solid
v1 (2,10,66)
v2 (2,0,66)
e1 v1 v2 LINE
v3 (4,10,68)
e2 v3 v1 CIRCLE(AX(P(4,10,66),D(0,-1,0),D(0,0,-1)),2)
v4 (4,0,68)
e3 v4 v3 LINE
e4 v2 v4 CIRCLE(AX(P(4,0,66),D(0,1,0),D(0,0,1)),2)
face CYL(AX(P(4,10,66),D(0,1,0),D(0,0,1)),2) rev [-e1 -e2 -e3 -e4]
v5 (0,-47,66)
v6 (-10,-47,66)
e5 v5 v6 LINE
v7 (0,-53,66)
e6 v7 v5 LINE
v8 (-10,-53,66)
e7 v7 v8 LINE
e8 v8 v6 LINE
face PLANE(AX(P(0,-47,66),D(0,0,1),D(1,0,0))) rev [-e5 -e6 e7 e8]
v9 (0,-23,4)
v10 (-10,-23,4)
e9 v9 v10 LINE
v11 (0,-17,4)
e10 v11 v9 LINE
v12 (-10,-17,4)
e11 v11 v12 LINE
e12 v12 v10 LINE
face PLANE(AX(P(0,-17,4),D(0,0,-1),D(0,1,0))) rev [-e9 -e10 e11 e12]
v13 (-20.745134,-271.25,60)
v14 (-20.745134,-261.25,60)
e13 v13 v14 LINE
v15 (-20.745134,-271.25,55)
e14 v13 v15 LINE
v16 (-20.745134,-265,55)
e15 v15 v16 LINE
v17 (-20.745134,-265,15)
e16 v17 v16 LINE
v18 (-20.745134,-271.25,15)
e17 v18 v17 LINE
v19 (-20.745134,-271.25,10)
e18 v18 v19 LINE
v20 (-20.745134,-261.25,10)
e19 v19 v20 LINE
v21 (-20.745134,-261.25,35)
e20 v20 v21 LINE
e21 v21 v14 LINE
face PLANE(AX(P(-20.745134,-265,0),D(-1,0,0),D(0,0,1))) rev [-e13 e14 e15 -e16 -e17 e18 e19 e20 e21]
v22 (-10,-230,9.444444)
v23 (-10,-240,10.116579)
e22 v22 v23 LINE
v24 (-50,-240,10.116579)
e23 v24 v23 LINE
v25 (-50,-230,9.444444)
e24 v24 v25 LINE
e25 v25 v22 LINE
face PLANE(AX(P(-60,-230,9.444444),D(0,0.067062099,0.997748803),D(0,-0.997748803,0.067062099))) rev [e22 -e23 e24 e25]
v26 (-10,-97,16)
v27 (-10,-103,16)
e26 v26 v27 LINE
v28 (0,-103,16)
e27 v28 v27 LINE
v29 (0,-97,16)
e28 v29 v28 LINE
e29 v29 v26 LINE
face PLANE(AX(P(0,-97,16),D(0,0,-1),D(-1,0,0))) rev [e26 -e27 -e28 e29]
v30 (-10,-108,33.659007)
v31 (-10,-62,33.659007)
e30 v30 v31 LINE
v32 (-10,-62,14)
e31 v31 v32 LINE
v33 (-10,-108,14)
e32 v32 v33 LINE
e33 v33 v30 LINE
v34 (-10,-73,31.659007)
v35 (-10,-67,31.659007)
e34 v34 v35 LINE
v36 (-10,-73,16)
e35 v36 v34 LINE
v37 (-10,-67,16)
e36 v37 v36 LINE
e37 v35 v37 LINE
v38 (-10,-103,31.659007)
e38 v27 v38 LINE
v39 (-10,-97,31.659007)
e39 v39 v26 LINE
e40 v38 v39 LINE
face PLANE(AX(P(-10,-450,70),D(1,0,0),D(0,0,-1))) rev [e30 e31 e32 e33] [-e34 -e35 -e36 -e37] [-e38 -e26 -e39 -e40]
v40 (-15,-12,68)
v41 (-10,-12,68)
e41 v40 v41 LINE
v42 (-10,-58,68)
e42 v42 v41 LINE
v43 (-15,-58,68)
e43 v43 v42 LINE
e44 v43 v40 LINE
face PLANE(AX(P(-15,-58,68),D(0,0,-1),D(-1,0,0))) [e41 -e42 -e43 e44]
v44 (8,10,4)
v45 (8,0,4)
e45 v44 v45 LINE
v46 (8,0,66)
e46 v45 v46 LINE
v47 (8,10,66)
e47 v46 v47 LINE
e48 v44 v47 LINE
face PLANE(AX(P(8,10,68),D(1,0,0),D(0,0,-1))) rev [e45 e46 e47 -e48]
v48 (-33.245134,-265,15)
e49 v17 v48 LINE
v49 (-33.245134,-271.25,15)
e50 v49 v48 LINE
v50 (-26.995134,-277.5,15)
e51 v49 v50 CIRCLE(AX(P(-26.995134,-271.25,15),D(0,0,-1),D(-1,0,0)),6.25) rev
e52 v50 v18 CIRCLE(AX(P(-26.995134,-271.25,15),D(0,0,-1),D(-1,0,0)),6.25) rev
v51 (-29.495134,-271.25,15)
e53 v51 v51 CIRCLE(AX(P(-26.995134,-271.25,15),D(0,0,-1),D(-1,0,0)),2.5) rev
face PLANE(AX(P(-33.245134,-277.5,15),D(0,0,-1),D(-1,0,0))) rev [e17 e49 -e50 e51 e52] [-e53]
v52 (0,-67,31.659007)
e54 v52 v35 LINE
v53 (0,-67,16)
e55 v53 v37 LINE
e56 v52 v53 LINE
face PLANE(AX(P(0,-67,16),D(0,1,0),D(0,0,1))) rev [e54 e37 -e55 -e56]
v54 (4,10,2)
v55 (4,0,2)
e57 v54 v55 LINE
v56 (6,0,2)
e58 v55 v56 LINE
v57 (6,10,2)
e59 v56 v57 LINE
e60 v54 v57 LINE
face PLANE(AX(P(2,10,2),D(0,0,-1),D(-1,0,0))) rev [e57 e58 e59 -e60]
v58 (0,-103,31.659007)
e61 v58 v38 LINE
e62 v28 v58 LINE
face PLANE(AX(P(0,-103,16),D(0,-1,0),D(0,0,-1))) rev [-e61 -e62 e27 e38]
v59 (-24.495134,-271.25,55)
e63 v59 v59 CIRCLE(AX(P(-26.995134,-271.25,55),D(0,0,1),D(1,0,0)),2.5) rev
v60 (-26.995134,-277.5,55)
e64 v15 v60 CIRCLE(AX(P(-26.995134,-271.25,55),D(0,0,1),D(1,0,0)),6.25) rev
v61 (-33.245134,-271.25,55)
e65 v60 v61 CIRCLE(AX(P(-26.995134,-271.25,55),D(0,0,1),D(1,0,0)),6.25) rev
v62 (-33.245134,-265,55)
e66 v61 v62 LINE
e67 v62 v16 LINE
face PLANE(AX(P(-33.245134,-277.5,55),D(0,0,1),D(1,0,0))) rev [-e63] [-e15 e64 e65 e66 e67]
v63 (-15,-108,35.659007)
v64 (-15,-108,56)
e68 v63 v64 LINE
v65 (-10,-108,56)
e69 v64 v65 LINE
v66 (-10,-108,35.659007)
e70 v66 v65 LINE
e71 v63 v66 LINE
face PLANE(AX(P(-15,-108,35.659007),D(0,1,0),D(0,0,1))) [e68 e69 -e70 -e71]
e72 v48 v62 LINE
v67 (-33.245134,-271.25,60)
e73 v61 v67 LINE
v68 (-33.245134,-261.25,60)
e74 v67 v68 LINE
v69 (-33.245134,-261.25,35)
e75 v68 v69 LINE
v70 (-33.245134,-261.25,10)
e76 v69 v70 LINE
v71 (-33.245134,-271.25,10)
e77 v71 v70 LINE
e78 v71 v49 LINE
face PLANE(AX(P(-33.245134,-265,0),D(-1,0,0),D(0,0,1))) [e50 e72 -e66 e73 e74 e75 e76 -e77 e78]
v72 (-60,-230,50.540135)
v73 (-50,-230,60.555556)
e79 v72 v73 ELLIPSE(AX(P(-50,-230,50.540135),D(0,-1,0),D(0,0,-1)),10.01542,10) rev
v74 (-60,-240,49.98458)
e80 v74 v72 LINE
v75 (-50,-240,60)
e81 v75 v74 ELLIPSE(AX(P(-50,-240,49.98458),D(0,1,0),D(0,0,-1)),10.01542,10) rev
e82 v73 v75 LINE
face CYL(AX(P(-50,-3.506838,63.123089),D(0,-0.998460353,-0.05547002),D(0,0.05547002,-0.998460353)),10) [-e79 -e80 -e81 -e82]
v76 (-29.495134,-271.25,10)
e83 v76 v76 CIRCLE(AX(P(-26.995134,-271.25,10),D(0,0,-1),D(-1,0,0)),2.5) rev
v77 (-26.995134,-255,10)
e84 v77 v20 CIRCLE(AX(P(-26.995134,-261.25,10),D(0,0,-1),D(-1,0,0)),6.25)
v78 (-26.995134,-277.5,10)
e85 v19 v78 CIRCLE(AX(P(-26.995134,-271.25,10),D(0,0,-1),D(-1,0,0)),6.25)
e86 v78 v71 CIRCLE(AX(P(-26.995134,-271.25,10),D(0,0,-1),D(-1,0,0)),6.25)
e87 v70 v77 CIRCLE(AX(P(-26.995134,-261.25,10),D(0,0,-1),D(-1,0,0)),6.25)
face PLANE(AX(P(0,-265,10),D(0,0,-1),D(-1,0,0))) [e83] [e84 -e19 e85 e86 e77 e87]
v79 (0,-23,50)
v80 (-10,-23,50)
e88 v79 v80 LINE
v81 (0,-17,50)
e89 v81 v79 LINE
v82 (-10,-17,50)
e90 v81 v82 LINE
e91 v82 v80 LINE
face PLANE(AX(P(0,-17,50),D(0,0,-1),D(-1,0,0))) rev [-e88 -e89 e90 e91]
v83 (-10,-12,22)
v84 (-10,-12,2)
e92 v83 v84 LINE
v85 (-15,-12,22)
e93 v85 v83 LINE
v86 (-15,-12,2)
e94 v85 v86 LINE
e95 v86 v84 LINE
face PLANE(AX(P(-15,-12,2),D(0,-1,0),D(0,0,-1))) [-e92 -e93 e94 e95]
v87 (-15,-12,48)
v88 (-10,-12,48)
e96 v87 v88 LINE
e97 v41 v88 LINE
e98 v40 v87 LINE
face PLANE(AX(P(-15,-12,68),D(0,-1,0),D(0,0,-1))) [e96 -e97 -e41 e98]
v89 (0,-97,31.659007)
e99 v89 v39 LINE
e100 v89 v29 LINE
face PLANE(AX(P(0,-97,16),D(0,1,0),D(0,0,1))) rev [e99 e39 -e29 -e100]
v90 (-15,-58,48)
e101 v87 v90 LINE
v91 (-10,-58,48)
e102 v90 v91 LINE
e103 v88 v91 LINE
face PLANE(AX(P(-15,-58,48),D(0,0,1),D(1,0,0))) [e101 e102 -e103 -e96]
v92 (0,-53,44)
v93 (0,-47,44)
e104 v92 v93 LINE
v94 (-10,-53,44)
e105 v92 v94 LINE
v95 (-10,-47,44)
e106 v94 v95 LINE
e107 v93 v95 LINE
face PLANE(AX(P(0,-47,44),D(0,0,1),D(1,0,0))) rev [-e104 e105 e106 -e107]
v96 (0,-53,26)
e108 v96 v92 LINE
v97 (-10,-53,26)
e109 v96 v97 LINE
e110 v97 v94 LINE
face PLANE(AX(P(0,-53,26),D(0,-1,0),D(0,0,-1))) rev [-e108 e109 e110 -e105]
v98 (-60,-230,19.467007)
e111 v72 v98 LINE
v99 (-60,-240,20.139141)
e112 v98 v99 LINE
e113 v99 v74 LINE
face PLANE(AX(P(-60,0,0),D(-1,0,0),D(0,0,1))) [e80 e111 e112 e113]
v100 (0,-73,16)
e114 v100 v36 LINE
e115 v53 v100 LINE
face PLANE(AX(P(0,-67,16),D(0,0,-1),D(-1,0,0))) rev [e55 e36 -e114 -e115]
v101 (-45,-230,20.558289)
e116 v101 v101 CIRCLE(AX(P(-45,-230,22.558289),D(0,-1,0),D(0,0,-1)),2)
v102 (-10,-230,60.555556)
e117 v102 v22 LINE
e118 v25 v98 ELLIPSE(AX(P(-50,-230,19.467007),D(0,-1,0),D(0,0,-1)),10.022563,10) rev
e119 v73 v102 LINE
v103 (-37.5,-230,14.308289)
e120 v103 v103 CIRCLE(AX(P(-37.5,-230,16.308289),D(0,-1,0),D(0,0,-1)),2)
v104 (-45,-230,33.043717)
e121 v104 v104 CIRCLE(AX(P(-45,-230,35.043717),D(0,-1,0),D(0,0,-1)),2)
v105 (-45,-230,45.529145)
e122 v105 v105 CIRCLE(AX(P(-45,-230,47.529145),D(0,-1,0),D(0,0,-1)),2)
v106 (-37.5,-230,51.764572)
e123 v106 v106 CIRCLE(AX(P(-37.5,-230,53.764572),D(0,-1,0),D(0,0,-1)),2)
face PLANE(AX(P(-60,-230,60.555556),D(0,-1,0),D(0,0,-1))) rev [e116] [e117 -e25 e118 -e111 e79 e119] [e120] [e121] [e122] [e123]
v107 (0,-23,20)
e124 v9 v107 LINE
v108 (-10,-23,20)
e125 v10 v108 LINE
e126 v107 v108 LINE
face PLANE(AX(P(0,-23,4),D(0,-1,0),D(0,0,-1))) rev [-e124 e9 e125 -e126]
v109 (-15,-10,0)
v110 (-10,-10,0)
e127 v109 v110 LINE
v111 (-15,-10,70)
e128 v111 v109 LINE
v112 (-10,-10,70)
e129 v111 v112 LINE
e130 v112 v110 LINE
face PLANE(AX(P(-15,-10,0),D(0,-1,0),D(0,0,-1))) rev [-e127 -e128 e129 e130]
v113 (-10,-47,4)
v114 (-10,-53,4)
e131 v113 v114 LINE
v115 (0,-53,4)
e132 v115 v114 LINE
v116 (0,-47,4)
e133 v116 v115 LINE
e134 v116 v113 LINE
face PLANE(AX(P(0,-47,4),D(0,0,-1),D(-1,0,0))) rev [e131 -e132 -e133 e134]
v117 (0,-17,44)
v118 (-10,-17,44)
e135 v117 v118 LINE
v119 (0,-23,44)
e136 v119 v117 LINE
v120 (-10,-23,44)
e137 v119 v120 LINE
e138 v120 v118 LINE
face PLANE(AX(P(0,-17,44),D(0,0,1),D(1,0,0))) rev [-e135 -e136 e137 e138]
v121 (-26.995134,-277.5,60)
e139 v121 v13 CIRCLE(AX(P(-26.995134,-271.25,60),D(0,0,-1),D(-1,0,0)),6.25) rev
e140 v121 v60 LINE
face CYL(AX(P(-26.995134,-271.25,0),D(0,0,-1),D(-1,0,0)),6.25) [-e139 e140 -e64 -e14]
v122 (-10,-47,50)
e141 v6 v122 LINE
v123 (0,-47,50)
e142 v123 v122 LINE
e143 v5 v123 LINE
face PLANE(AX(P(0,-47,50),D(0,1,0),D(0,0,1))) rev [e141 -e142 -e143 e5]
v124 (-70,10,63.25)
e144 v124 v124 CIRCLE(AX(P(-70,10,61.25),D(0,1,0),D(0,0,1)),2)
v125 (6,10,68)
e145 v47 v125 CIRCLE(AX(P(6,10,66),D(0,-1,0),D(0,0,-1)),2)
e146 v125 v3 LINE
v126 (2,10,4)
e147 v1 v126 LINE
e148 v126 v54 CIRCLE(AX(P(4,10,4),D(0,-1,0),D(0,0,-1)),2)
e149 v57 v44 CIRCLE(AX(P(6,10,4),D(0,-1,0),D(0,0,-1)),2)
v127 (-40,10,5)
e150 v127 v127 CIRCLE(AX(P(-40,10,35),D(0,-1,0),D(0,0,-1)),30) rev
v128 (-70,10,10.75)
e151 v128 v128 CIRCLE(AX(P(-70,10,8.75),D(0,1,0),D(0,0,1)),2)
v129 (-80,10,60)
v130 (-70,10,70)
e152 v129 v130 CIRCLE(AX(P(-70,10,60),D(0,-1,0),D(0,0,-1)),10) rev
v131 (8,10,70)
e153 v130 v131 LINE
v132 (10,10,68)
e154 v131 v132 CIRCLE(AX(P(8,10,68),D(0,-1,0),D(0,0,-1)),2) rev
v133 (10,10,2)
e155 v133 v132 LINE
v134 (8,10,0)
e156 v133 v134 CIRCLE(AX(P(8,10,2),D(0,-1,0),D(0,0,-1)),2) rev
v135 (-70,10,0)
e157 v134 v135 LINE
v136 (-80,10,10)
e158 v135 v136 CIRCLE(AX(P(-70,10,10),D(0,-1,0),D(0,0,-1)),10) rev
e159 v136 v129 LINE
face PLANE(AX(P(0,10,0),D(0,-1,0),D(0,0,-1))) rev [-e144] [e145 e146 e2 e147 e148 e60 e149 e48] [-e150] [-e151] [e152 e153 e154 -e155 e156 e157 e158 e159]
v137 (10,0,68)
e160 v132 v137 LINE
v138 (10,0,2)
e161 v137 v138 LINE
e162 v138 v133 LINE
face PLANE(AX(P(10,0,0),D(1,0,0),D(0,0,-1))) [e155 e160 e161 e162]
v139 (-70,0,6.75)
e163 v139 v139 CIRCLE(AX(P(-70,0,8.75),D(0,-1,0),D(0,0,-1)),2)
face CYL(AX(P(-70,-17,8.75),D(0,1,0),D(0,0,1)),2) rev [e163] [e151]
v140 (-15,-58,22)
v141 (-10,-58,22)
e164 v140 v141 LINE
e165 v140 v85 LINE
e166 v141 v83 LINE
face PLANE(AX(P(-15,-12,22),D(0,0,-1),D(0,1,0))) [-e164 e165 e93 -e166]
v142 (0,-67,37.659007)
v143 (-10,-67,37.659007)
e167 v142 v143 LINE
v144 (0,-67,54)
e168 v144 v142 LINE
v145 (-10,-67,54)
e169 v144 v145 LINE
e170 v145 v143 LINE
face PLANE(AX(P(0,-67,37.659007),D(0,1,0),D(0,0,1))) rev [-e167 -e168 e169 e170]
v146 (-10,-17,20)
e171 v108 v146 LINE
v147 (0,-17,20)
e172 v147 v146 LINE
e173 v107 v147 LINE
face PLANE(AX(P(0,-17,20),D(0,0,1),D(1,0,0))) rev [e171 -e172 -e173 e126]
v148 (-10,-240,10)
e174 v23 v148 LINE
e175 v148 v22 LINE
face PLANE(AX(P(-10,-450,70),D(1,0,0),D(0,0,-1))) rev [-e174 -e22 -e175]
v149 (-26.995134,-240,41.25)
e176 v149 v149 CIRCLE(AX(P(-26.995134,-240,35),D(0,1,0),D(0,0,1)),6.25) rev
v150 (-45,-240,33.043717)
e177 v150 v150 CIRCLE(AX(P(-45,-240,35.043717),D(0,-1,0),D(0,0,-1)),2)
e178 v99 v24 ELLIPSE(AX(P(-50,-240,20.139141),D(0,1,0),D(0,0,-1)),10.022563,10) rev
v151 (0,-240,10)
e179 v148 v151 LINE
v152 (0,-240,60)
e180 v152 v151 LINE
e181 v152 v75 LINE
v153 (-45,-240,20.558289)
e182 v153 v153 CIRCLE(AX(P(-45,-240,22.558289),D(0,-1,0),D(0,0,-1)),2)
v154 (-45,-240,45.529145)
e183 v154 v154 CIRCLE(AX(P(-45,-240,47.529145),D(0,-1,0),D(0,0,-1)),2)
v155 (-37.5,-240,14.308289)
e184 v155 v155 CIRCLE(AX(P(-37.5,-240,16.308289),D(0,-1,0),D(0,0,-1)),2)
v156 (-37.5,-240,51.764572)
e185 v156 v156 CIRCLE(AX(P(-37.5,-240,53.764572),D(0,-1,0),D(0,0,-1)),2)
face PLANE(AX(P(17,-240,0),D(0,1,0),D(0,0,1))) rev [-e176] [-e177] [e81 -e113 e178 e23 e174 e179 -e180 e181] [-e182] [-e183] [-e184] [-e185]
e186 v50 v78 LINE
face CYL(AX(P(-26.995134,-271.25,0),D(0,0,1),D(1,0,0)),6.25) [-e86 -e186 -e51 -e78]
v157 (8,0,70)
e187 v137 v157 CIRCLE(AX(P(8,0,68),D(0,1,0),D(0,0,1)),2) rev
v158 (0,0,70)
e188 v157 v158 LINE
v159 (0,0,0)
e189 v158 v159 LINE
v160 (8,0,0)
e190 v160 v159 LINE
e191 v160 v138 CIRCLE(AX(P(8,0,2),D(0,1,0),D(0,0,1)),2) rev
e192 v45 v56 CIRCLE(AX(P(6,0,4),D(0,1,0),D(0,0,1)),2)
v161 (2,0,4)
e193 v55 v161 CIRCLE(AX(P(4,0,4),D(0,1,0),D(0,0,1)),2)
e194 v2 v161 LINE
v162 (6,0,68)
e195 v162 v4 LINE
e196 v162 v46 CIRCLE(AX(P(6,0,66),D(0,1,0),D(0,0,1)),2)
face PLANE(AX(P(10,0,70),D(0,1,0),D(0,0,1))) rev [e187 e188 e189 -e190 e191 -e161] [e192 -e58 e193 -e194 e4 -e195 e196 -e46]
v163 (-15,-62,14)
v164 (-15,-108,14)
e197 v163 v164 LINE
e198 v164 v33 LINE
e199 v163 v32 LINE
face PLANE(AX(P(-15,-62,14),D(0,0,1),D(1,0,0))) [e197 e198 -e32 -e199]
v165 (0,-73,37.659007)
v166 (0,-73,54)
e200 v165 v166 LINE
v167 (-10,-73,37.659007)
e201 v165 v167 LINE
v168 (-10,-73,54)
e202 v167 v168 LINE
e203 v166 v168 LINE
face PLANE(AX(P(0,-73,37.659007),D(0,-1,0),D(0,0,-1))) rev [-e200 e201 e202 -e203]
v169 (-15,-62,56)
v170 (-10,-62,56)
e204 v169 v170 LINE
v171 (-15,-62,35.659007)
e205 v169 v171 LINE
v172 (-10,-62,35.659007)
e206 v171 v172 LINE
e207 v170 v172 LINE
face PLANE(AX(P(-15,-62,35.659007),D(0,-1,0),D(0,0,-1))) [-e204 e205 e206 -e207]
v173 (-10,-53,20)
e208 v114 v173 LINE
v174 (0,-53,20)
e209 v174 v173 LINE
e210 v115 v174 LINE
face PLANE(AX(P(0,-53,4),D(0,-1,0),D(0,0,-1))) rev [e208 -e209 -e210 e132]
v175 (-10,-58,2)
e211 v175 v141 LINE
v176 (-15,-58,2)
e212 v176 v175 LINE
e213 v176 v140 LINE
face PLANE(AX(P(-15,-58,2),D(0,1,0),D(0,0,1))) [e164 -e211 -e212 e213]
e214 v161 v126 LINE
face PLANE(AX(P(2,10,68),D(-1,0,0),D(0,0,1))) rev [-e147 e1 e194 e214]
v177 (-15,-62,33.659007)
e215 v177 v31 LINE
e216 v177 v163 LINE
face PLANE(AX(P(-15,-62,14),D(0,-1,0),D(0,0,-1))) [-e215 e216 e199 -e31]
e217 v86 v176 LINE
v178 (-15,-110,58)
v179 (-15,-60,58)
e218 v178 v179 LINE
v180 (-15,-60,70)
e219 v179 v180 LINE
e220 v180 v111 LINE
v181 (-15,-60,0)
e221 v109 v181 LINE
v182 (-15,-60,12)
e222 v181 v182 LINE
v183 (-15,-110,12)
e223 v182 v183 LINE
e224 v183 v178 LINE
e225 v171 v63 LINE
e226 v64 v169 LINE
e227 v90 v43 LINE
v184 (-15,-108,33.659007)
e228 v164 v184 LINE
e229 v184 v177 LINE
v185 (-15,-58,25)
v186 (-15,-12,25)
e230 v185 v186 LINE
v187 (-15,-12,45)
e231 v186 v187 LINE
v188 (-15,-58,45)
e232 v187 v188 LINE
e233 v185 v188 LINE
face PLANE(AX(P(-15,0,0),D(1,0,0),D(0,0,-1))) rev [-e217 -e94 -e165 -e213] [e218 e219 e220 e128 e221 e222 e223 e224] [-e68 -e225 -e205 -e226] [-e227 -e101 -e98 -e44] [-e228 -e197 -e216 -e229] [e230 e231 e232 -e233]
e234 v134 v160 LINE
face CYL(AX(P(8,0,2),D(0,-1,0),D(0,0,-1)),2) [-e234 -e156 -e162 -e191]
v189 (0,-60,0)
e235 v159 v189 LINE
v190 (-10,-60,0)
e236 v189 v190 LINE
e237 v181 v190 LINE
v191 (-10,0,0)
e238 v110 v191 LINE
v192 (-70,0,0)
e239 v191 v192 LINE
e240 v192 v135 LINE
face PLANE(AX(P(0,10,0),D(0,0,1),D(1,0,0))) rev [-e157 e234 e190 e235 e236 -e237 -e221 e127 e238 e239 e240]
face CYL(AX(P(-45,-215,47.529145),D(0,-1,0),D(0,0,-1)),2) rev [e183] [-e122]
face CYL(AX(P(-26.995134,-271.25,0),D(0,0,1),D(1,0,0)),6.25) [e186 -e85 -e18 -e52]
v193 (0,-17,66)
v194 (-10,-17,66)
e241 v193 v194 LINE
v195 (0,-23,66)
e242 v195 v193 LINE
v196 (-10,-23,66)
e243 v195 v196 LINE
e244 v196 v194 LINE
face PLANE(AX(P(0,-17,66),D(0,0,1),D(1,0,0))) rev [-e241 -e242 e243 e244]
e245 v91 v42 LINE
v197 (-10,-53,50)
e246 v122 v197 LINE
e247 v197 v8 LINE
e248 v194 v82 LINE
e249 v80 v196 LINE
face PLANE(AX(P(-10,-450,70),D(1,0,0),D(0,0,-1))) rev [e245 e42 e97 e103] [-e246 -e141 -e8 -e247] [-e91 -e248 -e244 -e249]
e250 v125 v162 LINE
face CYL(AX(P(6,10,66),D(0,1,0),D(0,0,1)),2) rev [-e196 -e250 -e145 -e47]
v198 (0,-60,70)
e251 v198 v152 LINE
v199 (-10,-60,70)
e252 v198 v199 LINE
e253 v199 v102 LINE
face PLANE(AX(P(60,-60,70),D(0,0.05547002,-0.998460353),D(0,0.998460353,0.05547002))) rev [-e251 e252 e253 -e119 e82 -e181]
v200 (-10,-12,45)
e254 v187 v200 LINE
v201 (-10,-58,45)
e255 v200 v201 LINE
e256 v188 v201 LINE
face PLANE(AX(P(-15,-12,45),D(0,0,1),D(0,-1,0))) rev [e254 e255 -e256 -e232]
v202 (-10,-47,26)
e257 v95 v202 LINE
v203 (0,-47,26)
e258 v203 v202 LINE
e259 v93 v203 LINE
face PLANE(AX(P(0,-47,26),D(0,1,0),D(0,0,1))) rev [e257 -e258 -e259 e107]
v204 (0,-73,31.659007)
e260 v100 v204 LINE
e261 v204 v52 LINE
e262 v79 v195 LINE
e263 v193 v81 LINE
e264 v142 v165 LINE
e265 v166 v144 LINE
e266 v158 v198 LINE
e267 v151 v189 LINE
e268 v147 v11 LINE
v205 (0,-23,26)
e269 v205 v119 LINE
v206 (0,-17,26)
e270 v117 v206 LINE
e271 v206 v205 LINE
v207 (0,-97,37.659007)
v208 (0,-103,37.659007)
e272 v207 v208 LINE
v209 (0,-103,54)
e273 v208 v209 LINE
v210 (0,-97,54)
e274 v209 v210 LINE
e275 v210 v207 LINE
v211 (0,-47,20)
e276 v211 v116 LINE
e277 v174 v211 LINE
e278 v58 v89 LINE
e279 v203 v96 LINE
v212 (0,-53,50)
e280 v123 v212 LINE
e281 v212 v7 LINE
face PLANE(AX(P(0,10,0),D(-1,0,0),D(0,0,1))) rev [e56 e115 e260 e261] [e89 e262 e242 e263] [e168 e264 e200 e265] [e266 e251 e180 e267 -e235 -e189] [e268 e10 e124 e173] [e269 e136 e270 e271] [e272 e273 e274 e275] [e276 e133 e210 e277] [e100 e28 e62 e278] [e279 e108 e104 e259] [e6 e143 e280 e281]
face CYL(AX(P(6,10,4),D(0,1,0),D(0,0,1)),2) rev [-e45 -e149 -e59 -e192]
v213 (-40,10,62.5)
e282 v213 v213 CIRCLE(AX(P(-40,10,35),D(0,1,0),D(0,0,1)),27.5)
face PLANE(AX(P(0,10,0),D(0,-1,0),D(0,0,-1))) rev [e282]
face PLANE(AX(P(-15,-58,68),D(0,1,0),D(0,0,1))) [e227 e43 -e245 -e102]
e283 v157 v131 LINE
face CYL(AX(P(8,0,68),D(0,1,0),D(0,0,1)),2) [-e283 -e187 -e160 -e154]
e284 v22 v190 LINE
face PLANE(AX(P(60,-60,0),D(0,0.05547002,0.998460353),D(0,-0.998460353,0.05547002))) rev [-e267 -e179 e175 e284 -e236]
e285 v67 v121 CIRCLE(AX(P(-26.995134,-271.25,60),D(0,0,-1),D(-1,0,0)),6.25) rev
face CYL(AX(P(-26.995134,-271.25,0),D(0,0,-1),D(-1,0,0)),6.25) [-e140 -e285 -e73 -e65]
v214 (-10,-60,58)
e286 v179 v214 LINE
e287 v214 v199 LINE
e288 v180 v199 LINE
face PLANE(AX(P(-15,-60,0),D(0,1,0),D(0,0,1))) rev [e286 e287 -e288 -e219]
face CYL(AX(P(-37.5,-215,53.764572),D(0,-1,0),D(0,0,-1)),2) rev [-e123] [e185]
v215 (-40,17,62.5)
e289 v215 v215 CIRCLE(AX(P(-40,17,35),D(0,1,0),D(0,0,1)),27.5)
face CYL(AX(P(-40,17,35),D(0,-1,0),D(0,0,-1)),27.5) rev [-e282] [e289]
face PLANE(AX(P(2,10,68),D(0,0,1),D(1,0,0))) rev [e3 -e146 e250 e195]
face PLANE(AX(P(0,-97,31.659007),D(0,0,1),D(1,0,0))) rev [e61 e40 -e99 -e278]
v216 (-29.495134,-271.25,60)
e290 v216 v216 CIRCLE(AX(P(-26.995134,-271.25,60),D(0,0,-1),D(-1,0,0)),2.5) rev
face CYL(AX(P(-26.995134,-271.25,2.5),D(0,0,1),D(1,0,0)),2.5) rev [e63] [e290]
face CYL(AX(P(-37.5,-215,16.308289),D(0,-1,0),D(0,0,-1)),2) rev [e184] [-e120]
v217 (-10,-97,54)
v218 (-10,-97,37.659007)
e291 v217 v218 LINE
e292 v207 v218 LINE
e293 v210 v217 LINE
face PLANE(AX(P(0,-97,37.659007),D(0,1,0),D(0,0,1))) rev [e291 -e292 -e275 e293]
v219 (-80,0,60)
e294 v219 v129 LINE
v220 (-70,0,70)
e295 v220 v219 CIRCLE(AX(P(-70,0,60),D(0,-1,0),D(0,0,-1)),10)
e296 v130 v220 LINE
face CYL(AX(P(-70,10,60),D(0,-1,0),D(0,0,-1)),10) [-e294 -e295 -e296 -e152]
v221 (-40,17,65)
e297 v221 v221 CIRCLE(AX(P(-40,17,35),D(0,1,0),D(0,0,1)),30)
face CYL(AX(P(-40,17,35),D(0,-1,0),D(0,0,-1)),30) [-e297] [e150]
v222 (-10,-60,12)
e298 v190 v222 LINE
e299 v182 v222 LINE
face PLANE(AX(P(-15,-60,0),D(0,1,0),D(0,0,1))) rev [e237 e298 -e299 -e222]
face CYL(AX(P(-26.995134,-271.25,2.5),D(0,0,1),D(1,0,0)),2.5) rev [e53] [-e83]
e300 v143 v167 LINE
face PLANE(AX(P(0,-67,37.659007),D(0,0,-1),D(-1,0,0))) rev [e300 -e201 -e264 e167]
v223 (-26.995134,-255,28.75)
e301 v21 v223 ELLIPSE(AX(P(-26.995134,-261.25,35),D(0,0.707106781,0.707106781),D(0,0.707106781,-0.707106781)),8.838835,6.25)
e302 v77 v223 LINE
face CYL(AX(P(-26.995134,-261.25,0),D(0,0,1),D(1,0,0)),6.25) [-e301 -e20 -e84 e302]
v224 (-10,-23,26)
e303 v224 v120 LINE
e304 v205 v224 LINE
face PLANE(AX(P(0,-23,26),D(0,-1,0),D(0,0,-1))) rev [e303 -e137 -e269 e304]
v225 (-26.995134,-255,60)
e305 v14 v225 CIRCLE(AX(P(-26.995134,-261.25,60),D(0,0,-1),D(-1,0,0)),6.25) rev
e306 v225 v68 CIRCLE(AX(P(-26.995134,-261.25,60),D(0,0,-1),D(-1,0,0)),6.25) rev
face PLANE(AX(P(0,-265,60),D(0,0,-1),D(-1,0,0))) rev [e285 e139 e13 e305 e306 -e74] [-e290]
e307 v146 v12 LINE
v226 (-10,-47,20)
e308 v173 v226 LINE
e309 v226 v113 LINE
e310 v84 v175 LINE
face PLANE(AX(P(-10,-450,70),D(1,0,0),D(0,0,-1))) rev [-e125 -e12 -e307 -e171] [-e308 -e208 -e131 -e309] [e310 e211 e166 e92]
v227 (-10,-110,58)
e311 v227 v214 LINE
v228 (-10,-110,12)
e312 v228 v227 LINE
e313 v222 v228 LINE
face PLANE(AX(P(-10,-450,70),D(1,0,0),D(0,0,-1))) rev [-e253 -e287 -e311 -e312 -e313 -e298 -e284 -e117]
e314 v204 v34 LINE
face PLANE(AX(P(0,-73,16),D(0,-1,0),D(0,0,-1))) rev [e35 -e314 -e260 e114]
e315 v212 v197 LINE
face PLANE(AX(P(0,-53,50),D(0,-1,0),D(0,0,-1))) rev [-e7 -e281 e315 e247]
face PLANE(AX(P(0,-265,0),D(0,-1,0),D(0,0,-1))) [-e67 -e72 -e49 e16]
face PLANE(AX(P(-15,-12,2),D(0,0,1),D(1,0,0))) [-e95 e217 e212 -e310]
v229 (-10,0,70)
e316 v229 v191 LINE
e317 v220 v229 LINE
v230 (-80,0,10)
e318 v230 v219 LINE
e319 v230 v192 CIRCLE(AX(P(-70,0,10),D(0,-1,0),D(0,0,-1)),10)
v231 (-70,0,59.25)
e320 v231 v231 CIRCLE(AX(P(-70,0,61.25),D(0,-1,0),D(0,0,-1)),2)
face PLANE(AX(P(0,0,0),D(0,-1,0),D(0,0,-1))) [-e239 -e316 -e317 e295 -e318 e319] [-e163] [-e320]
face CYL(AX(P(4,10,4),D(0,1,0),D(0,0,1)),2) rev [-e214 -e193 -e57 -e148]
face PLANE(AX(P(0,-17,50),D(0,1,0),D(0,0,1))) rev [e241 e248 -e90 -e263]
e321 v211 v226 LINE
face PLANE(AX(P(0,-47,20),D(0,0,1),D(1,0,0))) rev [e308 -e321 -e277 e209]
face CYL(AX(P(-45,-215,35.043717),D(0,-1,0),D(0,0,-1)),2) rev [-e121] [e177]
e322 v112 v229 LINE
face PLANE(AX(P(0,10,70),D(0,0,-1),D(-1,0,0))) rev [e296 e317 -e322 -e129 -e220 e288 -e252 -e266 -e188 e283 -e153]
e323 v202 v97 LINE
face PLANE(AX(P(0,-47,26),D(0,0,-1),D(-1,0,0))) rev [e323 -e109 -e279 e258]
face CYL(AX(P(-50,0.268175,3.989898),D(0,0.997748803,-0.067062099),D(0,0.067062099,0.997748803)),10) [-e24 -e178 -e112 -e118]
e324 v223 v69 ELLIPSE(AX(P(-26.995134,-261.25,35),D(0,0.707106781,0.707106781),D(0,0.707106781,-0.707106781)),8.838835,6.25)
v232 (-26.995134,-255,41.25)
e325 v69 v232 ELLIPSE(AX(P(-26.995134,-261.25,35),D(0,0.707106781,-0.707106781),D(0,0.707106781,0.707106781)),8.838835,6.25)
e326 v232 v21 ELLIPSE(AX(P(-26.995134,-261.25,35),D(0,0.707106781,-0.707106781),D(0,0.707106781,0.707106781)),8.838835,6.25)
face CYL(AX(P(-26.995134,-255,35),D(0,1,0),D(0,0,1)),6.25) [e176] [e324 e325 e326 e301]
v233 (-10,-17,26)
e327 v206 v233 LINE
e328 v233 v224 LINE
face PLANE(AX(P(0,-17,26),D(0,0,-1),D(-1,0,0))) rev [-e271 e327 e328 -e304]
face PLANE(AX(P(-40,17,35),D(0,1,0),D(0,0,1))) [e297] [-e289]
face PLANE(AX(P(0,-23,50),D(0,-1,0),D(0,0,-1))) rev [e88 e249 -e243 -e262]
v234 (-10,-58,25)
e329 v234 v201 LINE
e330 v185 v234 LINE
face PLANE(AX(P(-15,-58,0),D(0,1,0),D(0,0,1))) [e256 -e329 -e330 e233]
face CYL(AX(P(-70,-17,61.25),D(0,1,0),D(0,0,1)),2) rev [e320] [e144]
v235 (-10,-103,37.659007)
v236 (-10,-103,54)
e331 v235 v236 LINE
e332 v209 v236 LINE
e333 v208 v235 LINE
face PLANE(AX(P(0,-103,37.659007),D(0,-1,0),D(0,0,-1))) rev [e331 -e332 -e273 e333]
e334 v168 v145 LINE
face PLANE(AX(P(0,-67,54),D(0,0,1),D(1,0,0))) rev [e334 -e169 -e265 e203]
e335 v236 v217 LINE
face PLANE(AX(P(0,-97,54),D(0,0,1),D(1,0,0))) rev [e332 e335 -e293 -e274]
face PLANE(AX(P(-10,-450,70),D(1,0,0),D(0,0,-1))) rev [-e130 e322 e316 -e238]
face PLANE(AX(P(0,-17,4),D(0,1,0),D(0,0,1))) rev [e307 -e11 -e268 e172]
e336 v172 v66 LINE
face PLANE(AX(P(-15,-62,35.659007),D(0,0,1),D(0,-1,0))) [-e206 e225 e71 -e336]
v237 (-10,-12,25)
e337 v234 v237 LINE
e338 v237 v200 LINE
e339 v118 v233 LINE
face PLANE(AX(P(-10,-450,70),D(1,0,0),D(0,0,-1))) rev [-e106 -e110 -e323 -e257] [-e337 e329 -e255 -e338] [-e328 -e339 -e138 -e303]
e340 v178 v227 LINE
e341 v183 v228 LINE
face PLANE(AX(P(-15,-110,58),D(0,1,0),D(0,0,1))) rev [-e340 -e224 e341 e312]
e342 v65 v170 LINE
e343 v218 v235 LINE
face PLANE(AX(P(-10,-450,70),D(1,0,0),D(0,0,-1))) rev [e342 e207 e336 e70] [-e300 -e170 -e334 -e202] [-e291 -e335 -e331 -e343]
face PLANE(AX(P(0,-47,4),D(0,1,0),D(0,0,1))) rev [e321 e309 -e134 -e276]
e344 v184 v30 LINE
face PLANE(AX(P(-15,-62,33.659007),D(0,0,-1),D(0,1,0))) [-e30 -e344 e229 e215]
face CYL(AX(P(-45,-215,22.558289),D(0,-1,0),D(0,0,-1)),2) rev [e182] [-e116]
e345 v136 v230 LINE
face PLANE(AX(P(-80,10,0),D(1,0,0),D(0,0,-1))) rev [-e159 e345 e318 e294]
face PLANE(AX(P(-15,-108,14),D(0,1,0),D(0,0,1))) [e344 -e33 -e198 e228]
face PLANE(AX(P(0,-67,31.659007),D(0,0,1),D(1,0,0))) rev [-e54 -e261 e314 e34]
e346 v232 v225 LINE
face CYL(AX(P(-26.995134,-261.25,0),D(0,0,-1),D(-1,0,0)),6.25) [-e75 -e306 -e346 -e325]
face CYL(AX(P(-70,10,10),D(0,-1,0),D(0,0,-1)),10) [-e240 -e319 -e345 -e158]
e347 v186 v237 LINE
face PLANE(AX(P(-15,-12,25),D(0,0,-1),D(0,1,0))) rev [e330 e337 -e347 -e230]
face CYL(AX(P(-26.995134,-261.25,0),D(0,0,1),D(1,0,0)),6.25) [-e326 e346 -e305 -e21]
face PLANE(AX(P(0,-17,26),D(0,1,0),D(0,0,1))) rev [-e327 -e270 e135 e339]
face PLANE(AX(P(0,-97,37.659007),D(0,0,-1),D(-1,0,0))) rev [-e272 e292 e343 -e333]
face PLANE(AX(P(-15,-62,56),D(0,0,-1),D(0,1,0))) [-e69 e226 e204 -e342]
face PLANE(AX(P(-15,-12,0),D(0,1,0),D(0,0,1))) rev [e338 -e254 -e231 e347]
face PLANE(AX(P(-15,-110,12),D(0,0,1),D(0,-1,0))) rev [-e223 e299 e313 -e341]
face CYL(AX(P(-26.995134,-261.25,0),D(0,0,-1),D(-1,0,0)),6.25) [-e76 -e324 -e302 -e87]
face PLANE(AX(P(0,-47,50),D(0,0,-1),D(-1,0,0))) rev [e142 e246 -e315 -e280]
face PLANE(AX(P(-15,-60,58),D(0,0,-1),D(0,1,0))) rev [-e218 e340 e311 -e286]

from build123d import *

# Parameters (mm, degrees)
SKETCH1_W                = 80
SKETCH1_H                = 70
BOSS_EXTRUDE1_DEPTH      = 10
SKETCH2_W                = 10
SKETCH2_H                = 70
BOSS_EXTRUDE2_DEPTH      = 450
SKETCH3_R                = 30
SKETCH3_R_2              = 27.5
BOSS_EXTRUDE3_DEPTH      = 7
SKETCH6_R                = 2
CUT_EXTRUDE3_DEPTH       = 27
SKETCH7_W                = 70
SKETCH7_H                = 210
CUT_EXTRUDE4_DEPTH       = 27
CUT_EXTRUDE5_DEPTH       = 70
BOSS_EXTRUDE5_DEPTH      = 50
SKETCH12_R               = 10
SKETCH12_R_2             = 7.5
SKETCH12_R_3             = 2.5
BOSS_EXTRUDE6_DEPTH      = 25
SKETCH13_R               = 2
CUT_EXTRUDE6_DEPTH       = 25
SKETCH14_W               = 24
SKETCH14_H               = 50
SKETCH14_W_2             = 20
SKETCH14_H_2             = 46
BOSS_EXTRUDE7_DEPTH      = 5
SKETCH15_W               = 24
SKETCH15_H               = 50
SKETCH15_W_2             = 20
SKETCH15_H_2             = 46
BOSS_EXTRUDE8_DEPTH      = 5
SKETCH16_W               = 22
SKETCH16_H               = 2
BOSS_EXTRUDE9_DEPTH      = 5
SKETCH17_W               = 46
SKETCH17_H               = 50
SKETCH17_W_2             = 19.659007001
SKETCH17_H_2             = 46
SKETCH17_W_3             = 20.340992999
BOSS_EXTRUDE10_DEPTH     = 5
SKETCH18_W               = 16
SKETCH18_H               = 6
SKETCH18_W_2             = 18
CUT_EXTRUDE8_DEPTH       = 10
SKETCH19_W               = 15.659007001
SKETCH19_H               = 6
SKETCH19_W_2             = 16.340992999
CUT_EXTRUDE9_DEPTH       = 10
FILLET1_R                = 10
FILLET2_R                = 10
SKETCH20_W               = 70
SKETCH20_H               = 10
BOSS_EXTRUDE11_DEPTH     = 10
SKETCH21_W               = 6
SKETCH21_H               = 66
CUT_EXTRUDE10_DEPTH      = 10
FILLET3_R                = 2
FILLET4_R                = 2
FILLET5_R                = 2
SKETCH23_W               = 25.167549862
SKETCH23_H               = 25.727851888
CUT_EXTRUDE12_DEPTH      = 116
SKETCH25_R               = 6.25
BOSS_EXTRUDE12_DEPTH     = 15
SKETCH26_W               = 12.5
SKETCH26_H               = 21
SKETCH26_H_2             = 4
BOSS_EXTRUDE13_DEPTH     = 10
SKETCH27_W               = 12.5
SKETCH27_H               = 5
BOSS_EXTRUDE15_DEPTH     = 12.5
FILLET8_R                = 6.25
CUT_EXTRUDE14_DEPTH      = 52.5
CUT_EXTRUDE14_DEPTH_BACK = 12.5
SKETCH29_R               = 2.5
FILLET9_R                = 6.25
SKETCH30_W               = 1
SKETCH30_H               = 46
BOSS_EXTRUDE16_DEPTH     = 5


# Some blends are built 0.0001 mm under size
with BuildPart() as part:
    # Sketch1 → Boss-Extrude1 (new body)
    with BuildSketch(Plane(origin=(0, 0, 0), x_dir=(1, 0, 0), z_dir=(0, 1, 0))):
        with Locations((-40, -35)):
            Rectangle(SKETCH1_W, SKETCH1_H)
    extrude(amount=BOSS_EXTRUDE1_DEPTH)

    # Sketch2 → Boss-Extrude2 (add)
    with BuildSketch(Plane.XZ):
        with Locations((-5, 35)):
            Rectangle(SKETCH2_W, SKETCH2_H)
    extrude(amount=BOSS_EXTRUDE2_DEPTH)

    # Sketch3 → Boss-Extrude3 (add)
    with BuildSketch(Plane(origin=(0, 10, 0), x_dir=(1, 0, 0), z_dir=(0, 1, 0))):
        with Locations(Location((-40, -35, 0), (0, 0, 90))):
            Circle(SKETCH3_R)
        with Locations(Location((-40, -35, 0), (0, 0, 270))):
            Circle(SKETCH3_R_2, mode=Mode.SUBTRACT)
    extrude(amount=BOSS_EXTRUDE3_DEPTH)

    # Sketch6 → Cut-Extrude3 (cut)
    with BuildSketch(Plane(origin=(0, 10, 0), x_dir=(1, 0, 0), z_dir=(0, 1, 0))):
        with Locations(Location((-70, -61.25, 0), (0, 0, 270))):
            Circle(SKETCH6_R)
        with Locations(Location((-70, -8.75, 0), (0, 0, 270))):
            Circle(SKETCH6_R)
    extrude(amount=-CUT_EXTRUDE3_DEPTH, mode=Mode.SUBTRACT)

    # Sketch7 → Cut-Extrude4 (cut)
    with BuildSketch(Plane.ZY.offset(10)):
        with Locations((35, -345)):
            Rectangle(SKETCH7_W, SKETCH7_H)
    extrude(amount=-CUT_EXTRUDE4_DEPTH, mode=Mode.SUBTRACT)

    # Sketch10 → Cut-Extrude5 (cut)
    with BuildSketch(Plane.ZY.offset(10)):
        Polygon((0, -60), (10, -240), (0, -240), align=None)
        Polygon((70, -60), (60, -240), (70, -240), align=None)
    extrude(amount=-CUT_EXTRUDE5_DEPTH, mode=Mode.SUBTRACT)

    # Sketch11 → Boss-Extrude5 (add)
    with BuildSketch(Plane.ZY.offset(10)):
        Polygon((10.116578541, -240), (60, -240), (60.555555556, -230), (9.444444444, -230), align=None)
    extrude(amount=BOSS_EXTRUDE5_DEPTH)

    # Sketch12 → Boss-Extrude6 (add)
    # profile 1 of 2: a face of its own
    with BuildSketch(Plane.XZ.offset(240)):
        with Locations(Location((-30, 35, 0), (0, 0, 90))):
            Circle(SKETCH12_R)
        with Locations(Location((-30, 35, 0), (0, 0, 270))):
            Circle(SKETCH12_R_2, mode=Mode.SUBTRACT)
    # profile 2 of 2: a face of its own
    with BuildSketch(Plane.XZ.offset(240)):
        with Locations(Location((-30, 35, 0), (0, 0, 90))):
            Circle(SKETCH12_R_3)
    extrude(amount=BOSS_EXTRUDE6_DEPTH)

    # Sketch13 → Cut-Extrude6 (cut)
    with BuildSketch(Plane(origin=(0, -240, 0), x_dir=(-1, 0, 0), z_dir=(0, -1, 0))):
        with Locations(Location((45, -47.529144635, 0), (0, 0, 90))):
            Circle(SKETCH13_R)
        with Locations(Location((45, -22.558289271, 0), (0, 0, 90))):
            Circle(SKETCH13_R)
        with Locations(Location((45, -35.043716953, 0), (0, 0, 90))):
            Circle(SKETCH13_R)
        with Locations(Location((37.5, -53.764572318, 0), (0, 0, 90))):
            Circle(SKETCH13_R)
        with Locations(Location((37.5, -16.308289271, 0), (0, 0, 90))):
            Circle(SKETCH13_R)
    extrude(amount=-CUT_EXTRUDE6_DEPTH, mode=Mode.SUBTRACT)

    # Sketch14 → Boss-Extrude7 (add)
    with BuildSketch(Plane.ZY.offset(10)):
        with Locations((12, -35)):
            Rectangle(SKETCH14_W, SKETCH14_H)
        with Locations((12, -35)):
            Rectangle(SKETCH14_W_2, SKETCH14_H_2, mode=Mode.SUBTRACT)
    extrude(amount=BOSS_EXTRUDE7_DEPTH)

    # Sketch15 → Boss-Extrude8 (add)
    with BuildSketch(Plane.ZY.offset(10)):
        with Locations((58, -35)):
            Rectangle(SKETCH15_W, SKETCH15_H)
        with Locations((58, -35)):
            Rectangle(SKETCH15_W_2, SKETCH15_H_2, mode=Mode.SUBTRACT)
    extrude(amount=BOSS_EXTRUDE8_DEPTH)

    # Sketch16 → Boss-Extrude9 (add)
    with BuildSketch(Plane.ZY.offset(10)):
        with Locations((35, -11)):
            Rectangle(SKETCH16_W, SKETCH16_H)
        with Locations((35, -59)):
            Rectangle(SKETCH16_W, SKETCH16_H)
    extrude(amount=BOSS_EXTRUDE9_DEPTH)

    # Sketch17 → Boss-Extrude10 (add)
    with BuildSketch(Plane.ZY.offset(10)):
        with Locations((35, -85)):
            Rectangle(SKETCH17_W, SKETCH17_H)
        with Locations((23.8295035, -85)):
            Rectangle(SKETCH17_W_2, SKETCH17_H_2, mode=Mode.SUBTRACT)
        with Locations((45.8295035, -85)):
            Rectangle(SKETCH17_W_3, SKETCH17_H_2, mode=Mode.SUBTRACT)
    extrude(amount=BOSS_EXTRUDE10_DEPTH)

    # Sketch18 → Cut-Extrude8 (cut)
    with BuildSketch(Plane.ZY.offset(10)):
        with Locations((12, -20)):
            Rectangle(SKETCH18_W, SKETCH18_H)
        with Locations((35, -20)):
            Rectangle(SKETCH18_W_2, SKETCH18_H)
        with Locations((58, -20)):
            Rectangle(SKETCH18_W, SKETCH18_H)
        with Locations((12, -50)):
            Rectangle(SKETCH18_W, SKETCH18_H)
        with Locations((35, -50)):
            Rectangle(SKETCH18_W_2, SKETCH18_H)
        with Locations((58, -50)):
            Rectangle(SKETCH18_W, SKETCH18_H)
    extrude(amount=-CUT_EXTRUDE8_DEPTH, mode=Mode.SUBTRACT)

    # Sketch19 → Cut-Extrude9 (cut)
    with BuildSketch(Plane.ZY.offset(10)):
        with Locations((23.829503501, -70)):
            Rectangle(SKETCH19_W, SKETCH19_H)
        with Locations((23.829503501, -100)):
            Rectangle(SKETCH19_W, SKETCH19_H)
        with Locations((45.8295035, -70)):
            Rectangle(SKETCH19_W_2, SKETCH19_H)
        with Locations((45.8295035, -100)):
            Rectangle(SKETCH19_W_2, SKETCH19_H)
    extrude(amount=-CUT_EXTRUDE9_DEPTH, mode=Mode.SUBTRACT)

    # Fillet1
    fillet1_edges = [part.edges().sort_by_distance(p)[0] for p in [
        (-80, 5, 0),
        (-80, 5, 70),
    ]]
    fillet(fillet1_edges, radius=FILLET1_R)

    # Fillet2
    fillet2_edges = [part.edges().sort_by_distance(p)[0] for p in [
        (-60, -235, 9.780511493),
        (-60, -235, 60.277777778),
    ]]
    fillet(fillet2_edges, radius=FILLET2_R)

    # Sketch20 → Boss-Extrude11 (add)
    with BuildSketch(Plane(origin=(0, 0, 0), x_dir=(0, 0, -1), z_dir=(1, 0, 0))):
        with Locations((-35, 5)):
            Rectangle(SKETCH20_W, SKETCH20_H)
    extrude(amount=BOSS_EXTRUDE11_DEPTH)

    # Sketch21 → Cut-Extrude10 (cut)
    with BuildSketch(Plane.XZ):
        with Locations((5, 35)):
            Rectangle(SKETCH21_W, SKETCH21_H)
    extrude(amount=-CUT_EXTRUDE10_DEPTH, mode=Mode.SUBTRACT)

    # Fillet3
    fillet3_edges = [part.edges().sort_by_distance(p)[0] for p in [
        (10, 5, 70),
        (10, 5, 0),
    ]]
    fillet(fillet3_edges, radius=FILLET3_R)

    # Fillet4
    fillet4_edges = [part.edges().sort_by_distance(p)[0] for p in [
        (8, 5, 68),
        (8, 5, 2),
    ]]
    fillet(fillet4_edges, radius=FILLET4_R)

    # Fillet5
    fillet5_edges = [part.edges().sort_by_distance(p)[0] for p in [
        (2, 5, 2),
        (2, 5, 68),
    ]]
    fillet(fillet5_edges, radius=FILLET5_R)

    # Sketch23 → Cut-Extrude12 (cut)
    with BuildSketch(Plane.XZ.offset(240)):
        with Locations((-28.923795104, 37.128742303)):
            Rectangle(SKETCH23_W, SKETCH23_H)
    extrude(amount=CUT_EXTRUDE12_DEPTH, mode=Mode.SUBTRACT)

    # Sketch25 → Boss-Extrude12 (add)
    with BuildSketch(Plane(origin=(0, -240, 0), x_dir=(-1, 0, 0), z_dir=(0, -1, 0))):
        with Locations(Location((26.99513388, -35, 0), (0, 0, 270))):
            Circle(SKETCH25_R)
    extrude(amount=BOSS_EXTRUDE12_DEPTH)

    # Sketch26 → Boss-Extrude13 (add)
    with BuildSketch(Plane(origin=(0, -255, 0), x_dir=(-1, 0, 0), z_dir=(0, -1, 0))):
        with Locations((26.99513388, -45.5)):
            Rectangle(SKETCH26_W, SKETCH26_H)
        with Locations((26.99513388, -24.5)):
            Rectangle(SKETCH26_W, SKETCH26_H)
        with Locations((26.99513388, -12)):
            Rectangle(SKETCH26_W, SKETCH26_H_2)
        with Locations((26.99513388, -58)):
            Rectangle(SKETCH26_W, SKETCH26_H_2)
    extrude(amount=BOSS_EXTRUDE13_DEPTH)

    # Sketch27 → Boss-Extrude15 (add)
    with BuildSketch(Plane.XZ.offset(265)):
        with Locations((-26.99513388, 12.5)):
            Rectangle(SKETCH27_W, SKETCH27_H)
        with Locations((-26.99513388, 57.5)):
            Rectangle(SKETCH27_W, SKETCH27_H)
    extrude(amount=BOSS_EXTRUDE15_DEPTH)

    # Fillet8
    fillet8_edges = [part.edges().sort_by_distance(p)[0] for p in [
        (-20.74513388, -277.5, 57.5),
        (-33.24513388, -277.5, 57.5),
        (-20.74513388, -277.5, 12.5),
        (-33.24513388, -277.5, 12.5),
    ]]
    fillet(fillet8_edges, radius=FILLET8_R - 0.0001)  # a hair under: the kernel refuses the full size

    # Sketch29 → Cut-Extrude14 (cut, two sides: drawn at the far end of the back side and taken through both)
    with BuildSketch(Plane(origin=(0, 0, 55), x_dir=(-1, 0, 0), z_dir=(0, 0, -1)).offset(-CUT_EXTRUDE14_DEPTH_BACK)):
        with Locations(Location((26.99513388, -271.25, 0), (0, 0, 180))):
            Circle(SKETCH29_R)
    extrude(amount=CUT_EXTRUDE14_DEPTH + CUT_EXTRUDE14_DEPTH_BACK, mode=Mode.SUBTRACT)

    # Fillet9
    # the kernel refuses this fillet: 6.25 mm, written as the material it takes off along each edge
    with BuildSketch(Plane(origin=(-20.74513388, -255, 35), x_dir=(0, -1, 0), z_dir=(0, 0, 1))) as fillet9_piece_1_section:
        with BuildLine():
            CenterArc((FILLET9_R, -FILLET9_R), FILLET9_R, 90, 90)
            Line((0, -FILLET9_R), (0, 0))
            Line((0, 0), (FILLET9_R, 0))
        make_face()
    fillet9_piece_1 = extrude(amount=40.625, mode=Mode.PRIVATE)
    fillet9_piece_1 = fillet9_piece_1 - Plane(origin=(-26.99513388, -256.446444019, 35), x_dir=(0, 0, 1), z_dir=(0, 1, 0)) * Cylinder(6.25, 107, mode=Mode.PRIVATE)
    add(fillet9_piece_1, mode=Mode.SUBTRACT)
    with BuildSketch(Plane(origin=(-33.24513388, -255, 34.999999912), x_dir=(0, -1, 0), z_dir=(0, 0, 1))) as fillet9_piece_2_section:
        with BuildLine():
            CenterArc((FILLET9_R, FILLET9_R), FILLET9_R, 180, 90)
            Line((0, FILLET9_R), (0, 0))
            Line((0, 0), (FILLET9_R, 0))
        make_face()
    fillet9_piece_2 = extrude(amount=40.625000088, mode=Mode.PRIVATE)
    fillet9_piece_2 = fillet9_piece_2 - Plane(origin=(-26.99513388, -256.446444017, 35), x_dir=(0, 0, 1), z_dir=(0, 1, 0)) * Cylinder(6.25, 107, mode=Mode.PRIVATE)
    add(fillet9_piece_2, mode=Mode.SUBTRACT)
    with BuildSketch(Plane(origin=(-20.74513388, -255, -5.625), x_dir=(-1, 0, 0), z_dir=(0, 0, 1))) as fillet9_piece_3_section:
        with BuildLine():
            CenterArc((FILLET9_R, FILLET9_R), FILLET9_R, 180, 90)
            Line((0, FILLET9_R), (0, 0))
            Line((0, 0), (FILLET9_R, 0))
        make_face()
    fillet9_piece_3 = extrude(amount=40.625, mode=Mode.PRIVATE)
    fillet9_piece_3 = fillet9_piece_3 - Plane(origin=(-26.99513388, -256.446444019, 35), x_dir=(0, 0, 1), z_dir=(0, 1, 0)) * Cylinder(6.25, 107, mode=Mode.PRIVATE)
    add(fillet9_piece_3, mode=Mode.SUBTRACT)
    with BuildSketch(Plane(origin=(-33.24513388, -255, -5.625), x_dir=(0, -1, 0), z_dir=(0, 0, 1))) as fillet9_piece_4_section:
        with BuildLine():
            CenterArc((FILLET9_R, FILLET9_R), FILLET9_R, 180, 90)
            Line((0, FILLET9_R), (0, 0))
            Line((0, 0), (FILLET9_R, 0))
        make_face()
    fillet9_piece_4 = extrude(amount=40.624999912, mode=Mode.PRIVATE)
    fillet9_piece_4 = fillet9_piece_4 - Plane(origin=(-26.99513388, -256.446444019, 35), x_dir=(0, 0, 1), z_dir=(0, 1, 0)) * Cylinder(6.25, 107, mode=Mode.PRIVATE)
    add(fillet9_piece_4, mode=Mode.SUBTRACT)

    # Sketch30 → Boss-Extrude16 (add)
    with BuildSketch(Plane.ZY.offset(10)):
        with Locations((45.5, -35)):
            Rectangle(SKETCH30_W, SKETCH30_H)
        with Locations((24.5, -35)):
            Rectangle(SKETCH30_W, SKETCH30_H)
    extrude(amount=BOSS_EXTRUDE16_DEPTH)


solid = part.part
